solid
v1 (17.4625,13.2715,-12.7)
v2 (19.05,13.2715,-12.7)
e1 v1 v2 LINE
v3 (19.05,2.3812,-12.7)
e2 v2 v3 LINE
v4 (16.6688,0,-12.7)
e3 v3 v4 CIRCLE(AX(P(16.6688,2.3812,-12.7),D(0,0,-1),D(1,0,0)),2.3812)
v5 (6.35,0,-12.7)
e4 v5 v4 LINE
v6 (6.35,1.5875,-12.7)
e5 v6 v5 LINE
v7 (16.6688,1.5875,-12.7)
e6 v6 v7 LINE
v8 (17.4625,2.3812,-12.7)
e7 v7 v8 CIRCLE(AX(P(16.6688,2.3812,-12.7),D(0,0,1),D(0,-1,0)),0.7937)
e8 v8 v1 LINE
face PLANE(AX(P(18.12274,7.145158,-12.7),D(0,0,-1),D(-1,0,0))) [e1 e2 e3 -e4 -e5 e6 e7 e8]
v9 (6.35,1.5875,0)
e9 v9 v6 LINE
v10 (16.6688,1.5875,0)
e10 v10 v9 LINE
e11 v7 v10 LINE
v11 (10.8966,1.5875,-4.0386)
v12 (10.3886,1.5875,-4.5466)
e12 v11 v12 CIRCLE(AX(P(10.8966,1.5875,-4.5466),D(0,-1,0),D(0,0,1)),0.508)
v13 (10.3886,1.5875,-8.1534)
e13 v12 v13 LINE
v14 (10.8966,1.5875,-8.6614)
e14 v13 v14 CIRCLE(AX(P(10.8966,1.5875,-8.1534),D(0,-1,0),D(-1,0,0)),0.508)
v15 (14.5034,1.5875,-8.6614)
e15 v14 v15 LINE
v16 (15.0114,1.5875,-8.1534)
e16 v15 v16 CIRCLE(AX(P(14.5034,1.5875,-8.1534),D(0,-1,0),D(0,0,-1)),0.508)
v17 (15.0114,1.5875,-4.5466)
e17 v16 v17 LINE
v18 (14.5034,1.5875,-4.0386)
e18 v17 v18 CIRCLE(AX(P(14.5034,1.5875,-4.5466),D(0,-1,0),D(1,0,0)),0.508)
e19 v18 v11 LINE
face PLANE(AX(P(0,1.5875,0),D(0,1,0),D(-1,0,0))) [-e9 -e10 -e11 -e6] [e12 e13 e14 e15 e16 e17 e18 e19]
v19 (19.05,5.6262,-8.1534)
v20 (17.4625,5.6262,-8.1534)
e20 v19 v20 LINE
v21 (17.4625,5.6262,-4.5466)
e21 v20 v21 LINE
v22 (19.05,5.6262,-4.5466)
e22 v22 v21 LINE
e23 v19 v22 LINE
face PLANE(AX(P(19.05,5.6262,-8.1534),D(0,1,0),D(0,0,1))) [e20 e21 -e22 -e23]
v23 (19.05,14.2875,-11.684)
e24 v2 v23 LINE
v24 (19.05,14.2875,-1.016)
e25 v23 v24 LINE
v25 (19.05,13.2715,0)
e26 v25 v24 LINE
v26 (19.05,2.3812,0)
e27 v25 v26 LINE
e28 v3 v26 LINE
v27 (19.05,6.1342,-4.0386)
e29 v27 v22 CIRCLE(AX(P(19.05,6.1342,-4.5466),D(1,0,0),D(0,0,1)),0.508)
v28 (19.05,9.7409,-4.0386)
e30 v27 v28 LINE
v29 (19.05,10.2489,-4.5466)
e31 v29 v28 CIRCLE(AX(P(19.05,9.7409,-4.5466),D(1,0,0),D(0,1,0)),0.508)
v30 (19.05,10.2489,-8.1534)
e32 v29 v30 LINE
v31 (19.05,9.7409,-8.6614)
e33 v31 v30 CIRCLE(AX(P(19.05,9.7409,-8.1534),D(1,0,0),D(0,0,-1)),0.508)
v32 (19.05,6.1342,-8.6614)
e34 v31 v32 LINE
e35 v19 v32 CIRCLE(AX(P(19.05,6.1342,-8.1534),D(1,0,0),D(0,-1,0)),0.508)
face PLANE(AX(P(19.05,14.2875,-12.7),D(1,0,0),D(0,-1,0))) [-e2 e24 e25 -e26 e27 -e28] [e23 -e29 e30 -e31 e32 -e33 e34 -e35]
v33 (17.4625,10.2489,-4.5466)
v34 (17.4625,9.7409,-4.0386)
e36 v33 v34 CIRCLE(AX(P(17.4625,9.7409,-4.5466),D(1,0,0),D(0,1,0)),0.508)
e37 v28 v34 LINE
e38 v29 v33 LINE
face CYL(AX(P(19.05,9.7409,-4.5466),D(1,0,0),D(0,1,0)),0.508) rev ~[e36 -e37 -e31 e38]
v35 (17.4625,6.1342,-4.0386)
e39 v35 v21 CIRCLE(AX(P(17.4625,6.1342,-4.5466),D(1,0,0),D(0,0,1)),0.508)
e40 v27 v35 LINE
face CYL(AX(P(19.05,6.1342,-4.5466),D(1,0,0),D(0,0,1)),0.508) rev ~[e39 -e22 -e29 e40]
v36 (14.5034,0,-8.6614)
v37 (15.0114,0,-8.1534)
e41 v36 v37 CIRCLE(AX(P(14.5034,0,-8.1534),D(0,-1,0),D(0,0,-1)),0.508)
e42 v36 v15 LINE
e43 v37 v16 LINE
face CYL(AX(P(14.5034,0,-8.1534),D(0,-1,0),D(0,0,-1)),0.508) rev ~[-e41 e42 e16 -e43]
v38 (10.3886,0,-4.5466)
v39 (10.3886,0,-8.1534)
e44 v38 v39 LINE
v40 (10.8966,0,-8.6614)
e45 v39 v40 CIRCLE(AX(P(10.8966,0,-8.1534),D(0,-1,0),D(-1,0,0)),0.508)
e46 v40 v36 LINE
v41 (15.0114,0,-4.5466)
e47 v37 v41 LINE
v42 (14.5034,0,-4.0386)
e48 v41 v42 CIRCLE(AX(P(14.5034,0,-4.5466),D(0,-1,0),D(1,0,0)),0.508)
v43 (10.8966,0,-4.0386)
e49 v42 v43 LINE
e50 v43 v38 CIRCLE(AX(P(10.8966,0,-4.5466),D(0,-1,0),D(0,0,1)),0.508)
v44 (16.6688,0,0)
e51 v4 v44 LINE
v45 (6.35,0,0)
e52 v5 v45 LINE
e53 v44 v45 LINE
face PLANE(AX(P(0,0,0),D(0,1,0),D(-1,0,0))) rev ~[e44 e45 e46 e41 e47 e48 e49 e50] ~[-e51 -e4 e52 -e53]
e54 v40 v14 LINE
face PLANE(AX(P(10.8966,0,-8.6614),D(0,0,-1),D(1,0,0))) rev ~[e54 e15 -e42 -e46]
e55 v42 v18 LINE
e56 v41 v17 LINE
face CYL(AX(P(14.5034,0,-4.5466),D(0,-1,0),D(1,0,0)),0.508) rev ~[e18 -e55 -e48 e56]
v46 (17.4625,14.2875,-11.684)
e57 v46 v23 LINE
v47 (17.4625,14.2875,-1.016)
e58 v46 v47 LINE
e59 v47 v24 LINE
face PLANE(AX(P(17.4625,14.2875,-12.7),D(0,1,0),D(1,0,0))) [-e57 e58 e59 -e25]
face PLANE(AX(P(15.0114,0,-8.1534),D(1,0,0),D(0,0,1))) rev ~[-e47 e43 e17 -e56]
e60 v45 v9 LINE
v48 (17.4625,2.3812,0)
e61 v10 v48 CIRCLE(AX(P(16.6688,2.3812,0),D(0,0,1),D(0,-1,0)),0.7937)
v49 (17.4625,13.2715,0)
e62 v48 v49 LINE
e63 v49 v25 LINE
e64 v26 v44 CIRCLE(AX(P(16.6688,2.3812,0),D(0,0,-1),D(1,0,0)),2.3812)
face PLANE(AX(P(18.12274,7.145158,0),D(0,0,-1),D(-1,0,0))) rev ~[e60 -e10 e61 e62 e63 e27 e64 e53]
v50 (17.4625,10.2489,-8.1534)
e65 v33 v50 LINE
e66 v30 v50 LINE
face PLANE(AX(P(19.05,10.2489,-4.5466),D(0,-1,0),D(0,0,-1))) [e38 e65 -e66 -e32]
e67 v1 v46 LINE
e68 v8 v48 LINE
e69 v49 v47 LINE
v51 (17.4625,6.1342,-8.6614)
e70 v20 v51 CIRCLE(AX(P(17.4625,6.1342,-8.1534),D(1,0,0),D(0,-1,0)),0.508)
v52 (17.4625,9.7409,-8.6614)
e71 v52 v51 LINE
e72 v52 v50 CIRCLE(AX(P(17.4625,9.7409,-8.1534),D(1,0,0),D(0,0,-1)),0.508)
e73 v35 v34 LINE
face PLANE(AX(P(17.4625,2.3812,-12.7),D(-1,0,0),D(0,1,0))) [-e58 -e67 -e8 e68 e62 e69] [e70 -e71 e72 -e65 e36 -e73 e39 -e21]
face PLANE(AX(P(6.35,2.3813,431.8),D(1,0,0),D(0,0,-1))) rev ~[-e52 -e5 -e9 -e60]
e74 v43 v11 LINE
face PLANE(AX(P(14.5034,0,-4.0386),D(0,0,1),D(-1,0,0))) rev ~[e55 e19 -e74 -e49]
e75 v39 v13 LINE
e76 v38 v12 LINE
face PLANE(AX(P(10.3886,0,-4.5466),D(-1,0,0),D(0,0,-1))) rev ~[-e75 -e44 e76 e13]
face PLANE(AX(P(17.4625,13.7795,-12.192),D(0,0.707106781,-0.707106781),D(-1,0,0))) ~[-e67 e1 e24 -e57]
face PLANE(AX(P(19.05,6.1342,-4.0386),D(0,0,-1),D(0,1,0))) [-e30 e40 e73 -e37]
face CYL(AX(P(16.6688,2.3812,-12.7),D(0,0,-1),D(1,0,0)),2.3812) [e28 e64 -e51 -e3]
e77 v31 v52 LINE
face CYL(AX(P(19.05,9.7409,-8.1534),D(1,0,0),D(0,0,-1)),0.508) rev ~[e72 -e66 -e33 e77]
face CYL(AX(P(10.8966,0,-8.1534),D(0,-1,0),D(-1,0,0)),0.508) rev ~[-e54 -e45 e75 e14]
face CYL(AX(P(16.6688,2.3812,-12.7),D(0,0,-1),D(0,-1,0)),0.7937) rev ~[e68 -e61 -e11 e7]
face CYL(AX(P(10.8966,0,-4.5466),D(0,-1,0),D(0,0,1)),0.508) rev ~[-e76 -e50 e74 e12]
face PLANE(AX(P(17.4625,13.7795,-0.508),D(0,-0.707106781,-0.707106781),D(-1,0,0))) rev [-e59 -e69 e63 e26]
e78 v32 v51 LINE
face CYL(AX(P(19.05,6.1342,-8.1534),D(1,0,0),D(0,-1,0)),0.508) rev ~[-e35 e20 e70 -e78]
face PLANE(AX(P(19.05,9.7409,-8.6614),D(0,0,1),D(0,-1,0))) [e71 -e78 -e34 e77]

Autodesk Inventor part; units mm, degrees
ref_plane "YZ Plane" through (0, 0, 0) normal (1, 0, 0) x (0, 1, 0)
ref_plane "XZ Plane" through (0, 0, 0) normal (0, 1, 0) x (-1, 0, 0)
sketch "Sketch1" plane through (0, 0, 0) normal (0, 1, 0) x (-1, 0, 0)
  line L0 (-19.05, 0) -> (19.05, 0)
  line L1 (19.05, 0) -> (19.05, -12.7)
  line L2 (19.05, -12.7) -> (-19.05, -12.7)
  line L3 (-19.05, -12.7) -> (-19.05, 0)
  line L4 (19.05, 0) -> (-19.05, -12.7) construction
  point P0 (0, 0)
  point P1 (0, 0)
  dimension "d0" = 38.1
  dimension "d1" = 12.7
extrude "Plate1" add sketch "Sketch1" along normal blind 1.5875
sketch "Sketch2" plane through (17.4625, 0, -12.7) normal (1, 0, 0) x (0, 1, 0)
  line L0 (0, 12.7) -> (0, 0)
  line L1 (0, 0) -> (14.2875, 0)
  line L2 (14.2875, 0) -> (14.2875, 12.7)
  line L3 (14.2875, 12.7) -> (0, 12.7)
edge flange "Flanges" height 12.7 angle 90 thickness 1.5875 bend radius 0.7937 thickness toward (1, 0, 0) relief tear relief width 1.5875 relief depth 0.7937 corner gap 1.5875 corner form 0 edges at (19.05, 1.5875, -6.35) (-19.05, 1.5875, -6.35) wall of the first edge with corners at (17.4625, 0, 0) (17.4625, 0, -12.7) (17.4625, 14.2875, -12.7) (17.4625, 14.2875, 0)
bend "Bend1"
corner "Corner1"
sketch "Sketch3" plane through (19.05, 2.3813, -12.7) normal (1, 0, 0) x (0, 0, -1)
  line L0 (-8.1534, 7.8676) -> (-4.5466, 7.8676)
  line L1 (-4.0386, 7.3596) -> (-4.0386, 3.7529)
  line L2 (-4.5466, 3.2449) -> (-8.1534, 3.2449)
  line L3 (-8.6614, 3.7529) -> (-8.6614, 7.3596)
  arc A0 (-8.1534, 7.8676) -> (-8.6614, 7.3596) centre (-8.1534, 7.3596) ccw
  arc A1 (-4.0386, 7.3596) -> (-4.5466, 7.8676) centre (-4.5466, 7.3596) ccw
  arc A2 (-4.5466, 3.2449) -> (-4.0386, 3.7529) centre (-4.5466, 3.7529) ccw
  arc A3 (-8.6614, 3.7529) -> (-8.1534, 3.2449) centre (-8.1534, 3.7529) ccw
  line L4 (-12.7, 0) -> (-12.7, 11.9063) construction
  line L5 (-12.7, 11.9063) -> (0, 11.9063) construction
  line L6 (-8.1534, 7.3596) -> (-4.5466, 3.7529) construction
  point P0 (-12.7, -2.3812)
  point P1 (-4.0386, 3.2449)
  point P2 (-8.6614, 3.2449)
  point P3 (-6.35, 5.5563)
  dimension "d16" = 4.6228
  dimension "d17" = 0.508
  dimension "d20" = 6.35
  dimension "d21" = 6.35
extrude "Flange Stamp" cut sketch "Sketch3" against normal blind 1.5875
sketch "Sketch7" plane through (19.05, 2.3813, 0) normal (1, 0, 0) x (0, 0, -1)
  arc A0 (4.5466, 7.8676) -> (4.0386, 7.3596) centre (4.5466, 7.3596) ccw construction
  arc A1 (8.1534, 3.2449) -> (8.6614, 3.7529) centre (8.1534, 3.7529) ccw construction
  circle A2 centre (6.35, 5.5563) radius 2.1844
  line L0 (4.5466, 7.3596) -> (8.1534, 3.7529) construction
  point P0 (0, -2.3812)
  dimension "d46" = 4.3688
surface extrude "Flange Circle" sketch "Sketch7" against normal up to surface (1.5875 mm away) shown yes curves A2
ref_plane "Flange Pattern Plane" through (19.05, 7.9375, -4.5466) normal (0, 1, 0) x (1, 0, 0)
feature "Flange Pattern" [suppressed]
sketch "Sketch8" plane through (0, 0, 0) normal (0, -1, 0) x (1, 0, 0)
  line L0 (16.6687, 0) -> (-16.6687, 0) construction
  line L1 (14.5034, -4.0386) -> (10.8966, -4.0386)
  line L2 (10.3886, -4.5466) -> (10.3886, -8.1534)
  line L3 (10.8966, -8.6614) -> (14.5034, -8.6614)
  line L4 (15.0114, -8.1534) -> (15.0114, -4.5466)
  arc A0 (15.0114, -4.5466) -> (14.5034, -4.0386) centre (14.5034, -4.5466) ccw
  arc A1 (14.5034, -8.6614) -> (15.0114, -8.1534) centre (14.5034, -8.1534) ccw
  arc A2 (10.3886, -8.1534) -> (10.8966, -8.6614) centre (10.8966, -8.1534) ccw
  arc A3 (10.8966, -4.0386) -> (10.3886, -4.5466) centre (10.8966, -4.5466) ccw
  line L5 (14.5034, -4.5466) -> (10.8966, -8.1534) construction
  line L6 (19.05, 0) -> (19.05, -12.7) construction
  point P0 (0, 0)
  point P1 (10.3886, -8.6614)
  point P2 (15.0114, -8.6614)
  point P3 (12.7, -6.35)
  dimension "d49" = 4.6228
  dimension "d50" = 0.508
  dimension "d51" = 6.35
  dimension "d52" = 6.35
extrude "Body Stamp" cut sketch "Sketch8" against normal blind 1.5875
sketch "Sketch9" plane through (0, 0, 0) normal (0, -1, 0) x (1, 0, 0)
  arc A0 (15.0114, -4.5466) -> (14.5034, -4.0386) centre (14.5034, -4.5466) ccw construction
  arc A1 (10.3886, -8.1534) -> (10.8966, -8.6614) centre (10.8966, -8.1534) ccw construction
  line L0 (14.5034, -4.5466) -> (10.8966, -8.1534) construction
  circle A2 centre (12.7, -6.35) radius 2.1844
  point P0 (0, 0)
  dimension "d55" = 4.3688
surface extrude "Body Circle" sketch "Sketch9" against normal up to surface (1.5875 mm away) shown yes curves A2
feature "Body Pattern" [suppressed]
sketch "Arc Length" plane through (17.4625, 2.3813, 0) normal (0, 0, 1) x (1, 0, 0)
  line L0 (0, 0) -> (1.5875, 0) construction
  arc A0 (-0.7938, -0.7938) -> (0, 0) centre (-0.7937, 0) ccw construction
  line L1 (-0.7938, -2.3813) -> (-0.7938, -0.7938) construction
  arc A1 (-0.7938, -2.3813) -> (1.5875, 0) centre (-0.7937, 0) ccw construction
  point P0 (-17.4625, -2.3812)
  dimension "d85" = 3.7405
  dimension "d92" = 1.2468
sketch "Sketch13" plane through (19.05, 14.2875, 0) normal (1, 0, 0) x (0, 0, -1)
  line L0 (0, 0) -> (12.7, 0) construction
  line L1 (62.4078, 0) -> (63.4238, -1.016)
  line L2 (63.4238, -1.016) -> (64.4398, 0)
  line L3 (62.4078, 0) -> (64.4398, 0)
  line L4 (12.7, -11.9063) -> (0, -11.9062) construction
  line L5 (63.4238, -10.8903) -> (61.161, -13.1531)
  line L6 (61.161, -13.1531) -> (63.4238, -15.4159)
  line L7 (63.4238, -15.4159) -> (65.6866, -13.1531)
  line L8 (65.6866, -13.1531) -> (63.4238, -10.8903)
  line L9 (63.4238, -10.8903) -> (63.4238, -15.4159) construction
  line L10 (63.4238, -1.016) -> (63.4238, -10.8903) construction
  line L11 (0, -11.9062) -> (12.7, -11.9063) construction
  point P0 (0, -14.2875)
  dimension "d86" = 4.5256
  dimension "d88" = 1.016
  dimension "d91" = 1.016
  dimension "d102" = 63.4238
feature "Notch" [suppressed]
mirror "Notch Mirror" [suppressed]
pattern_linear "Notch Pattern" [suppressed]
chamfer "End Chamfer" distance 1.016 angle 45 4 edges at (-18.2563, 14.2875, -12.7) (18.2563, 14.2875, -12.7) (-18.2562, 14.2875, 0) (18.2562, 14.2875, 0)
sketch "Sketch14" plane through (-19.05, 2.3813, 431.8) normal (1, 0, 0) x (0, 0, -1)
  line L0 (431.8, 11.9063) -> (444.5, 11.9063) construction
  line L1 (431.8, 0) -> (431.8, 11.9063) construction
  line L2 (431.8, -2.3813) -> (444.5, -2.3813) construction
  line L3 (431.8, 11.9063) -> (444.5, 11.9063)
  line L4 (444.5, 11.9063) -> (444.5, -2.3813)
  line L5 (444.5, -2.3813) -> (431.8, -2.3813)
  line L6 (431.8, -2.3813) -> (431.8, 11.9063)
  point P0 (431.8, -2.3812)
  point P1 (382.0521, -1.9844)
extrude "Half Cut" cut sketch "Sketch14" along normal blind 25.4
sketch "Flange Pattern Sketch" plane through (19.05, 7.9375, -4.5466) normal (0, 1, 0) x (1, 0, 0)
  line L0 (0, 3.6068) -> (0, 0) construction
  line L1 (-45.8186, -4.5466) -> (8.2118, -4.5466) construction
  line L2 (0, 0) -> (-1.5875, 0) construction
  point P0 (-19.05, -4.5466)
  point P1 (0, 1.8034)
  point P2 (0, 14.5034)
  point P3 (0, 27.2034)
  point P4 (0, 39.9034)
  point P5 (0, 52.6034)
  point P6 (0, 65.3034)
  point P7 (0, 78.0034)
  point P8 (0, 90.7034)
  point P9 (0, 103.4034)
  point P10 (0, 116.1034)
  point P11 (0, 128.8034)
  point P12 (0, 141.5034)
  point P13 (0, 154.2034)
  point P14 (0, 166.9034)
  point P15 (0, 179.6034)
  point P16 (0, 192.3034)
  point P17 (0, 205.0034)
  point P18 (0, 217.7034)
  point P19 (0, 230.4034)
  point P20 (0, 243.1034)
  point P21 (0, 255.8034)
  point P22 (0, 268.5034)
  point P23 (0, 281.2034)
  point P24 (0, 293.9034)
  point P25 (0, 306.6034)
  point P26 (0, 319.3034)
  point P27 (0, 332.0034)
  point P28 (0, 344.7034)
  point P29 (0, 357.4034)
  point P30 (0, 370.1034)
  point P31 (0, 382.8034)
  point P32 (0, 395.5034)
  point P33 (0, 408.2034)
  point P34 (0, 420.9034)
  point P35 (0, 433.6034)
  dimension "d131" = 12.7
  dimension "d134" = 12.7
sketch "Body Pattern Sketch" plane through (0, 0, 0) normal (0, -1, 0) x (1, 0, 0)
  line L0 (16.6687, 0) -> (-16.6687, 0) construction
  line L1 (19.05, 0) -> (19.05, -12.7) construction
  circle A0 centre (12.7, -6.35) radius 2.1844 construction
  point P0 (0, 0)
  point P1 (12.7, -19.05)
  point P2 (12.7, -31.75)
  point P3 (12.7, -44.45)
  point P4 (12.7, -57.15)
  point P5 (12.7, -69.85)
  point P6 (12.7, -82.55)
  point P7 (12.7, -95.25)
  point P8 (12.7, -107.95)
  point P9 (12.7, -120.65)
  point P10 (12.7, -133.35)
  point P11 (12.7, -146.05)
  point P12 (12.7, -158.75)
  point P13 (12.7, -171.45)
  point P14 (12.7, -184.15)
  point P15 (12.7, -196.85)
  point P16 (12.7, -209.55)
  point P17 (12.7, -222.25)
  point P18 (12.7, -234.95)
  point P19 (12.7, -247.65)
  point P20 (12.7, -260.35)
  point P21 (12.7, -273.05)
  point P22 (12.7, -285.75)
  point P23 (12.7, -298.45)
  point P24 (12.7, -311.15)
  point P25 (12.7, -323.85)
  point P26 (12.7, -336.55)
  point P27 (12.7, -349.25)
  point P28 (12.7, -361.95)
  point P29 (12.7, -374.65)
  point P30 (12.7, -387.35)
  point P31 (12.7, -400.05)
  point P32 (12.7, -412.75)
  point P33 (12.7, -425.45)
  point P34 (12.7, -438.15)
  dimension "d62" = 12.7
  dimension "d65" = 12.7
  dimension "d139" = 12.7
equation "\"d1\" = 12.7 * Length"
equation "\"d18\" = Thickness"
equation "\"d53\" = Thickness"
equation "\"d89\" = Thickness"
equation "\"d2\" = Thickness"
equation "\"d3\" = BendReliefWidth"
equation "\"d4\" = BendReliefDepth"
equation "\"d5\" = MinimumRemnant"
equation "\"d6\" = TransitionRadius"
equation "\"d10\" = CornerReliefSize"
equation "\"d11\" = GapSize"
equation "\"d12\" = JacobiRadiusSize"
equation "\"BendRadius\" = Thickness"
equation "\"BendReliefWidth\" = Thickness"
equation "\"BendReliefDepth\" = 0.5 * Thickness"
equation "\"CornerReliefSize\" = 4 * Thickness"
equation "\"MinimumRemnant\" = 2 * Thickness"
equation "\"TransitionRadius\" = BendRadius"
equation "\"JacobiRadiusSize\" = BendRadius"
equation "\"GapSize\" = Thickness"
equation "\"Length\" = 1"
equation "\"Thickness\" = 1.5875"
properties part number "Alu C 1x3x1x35"
